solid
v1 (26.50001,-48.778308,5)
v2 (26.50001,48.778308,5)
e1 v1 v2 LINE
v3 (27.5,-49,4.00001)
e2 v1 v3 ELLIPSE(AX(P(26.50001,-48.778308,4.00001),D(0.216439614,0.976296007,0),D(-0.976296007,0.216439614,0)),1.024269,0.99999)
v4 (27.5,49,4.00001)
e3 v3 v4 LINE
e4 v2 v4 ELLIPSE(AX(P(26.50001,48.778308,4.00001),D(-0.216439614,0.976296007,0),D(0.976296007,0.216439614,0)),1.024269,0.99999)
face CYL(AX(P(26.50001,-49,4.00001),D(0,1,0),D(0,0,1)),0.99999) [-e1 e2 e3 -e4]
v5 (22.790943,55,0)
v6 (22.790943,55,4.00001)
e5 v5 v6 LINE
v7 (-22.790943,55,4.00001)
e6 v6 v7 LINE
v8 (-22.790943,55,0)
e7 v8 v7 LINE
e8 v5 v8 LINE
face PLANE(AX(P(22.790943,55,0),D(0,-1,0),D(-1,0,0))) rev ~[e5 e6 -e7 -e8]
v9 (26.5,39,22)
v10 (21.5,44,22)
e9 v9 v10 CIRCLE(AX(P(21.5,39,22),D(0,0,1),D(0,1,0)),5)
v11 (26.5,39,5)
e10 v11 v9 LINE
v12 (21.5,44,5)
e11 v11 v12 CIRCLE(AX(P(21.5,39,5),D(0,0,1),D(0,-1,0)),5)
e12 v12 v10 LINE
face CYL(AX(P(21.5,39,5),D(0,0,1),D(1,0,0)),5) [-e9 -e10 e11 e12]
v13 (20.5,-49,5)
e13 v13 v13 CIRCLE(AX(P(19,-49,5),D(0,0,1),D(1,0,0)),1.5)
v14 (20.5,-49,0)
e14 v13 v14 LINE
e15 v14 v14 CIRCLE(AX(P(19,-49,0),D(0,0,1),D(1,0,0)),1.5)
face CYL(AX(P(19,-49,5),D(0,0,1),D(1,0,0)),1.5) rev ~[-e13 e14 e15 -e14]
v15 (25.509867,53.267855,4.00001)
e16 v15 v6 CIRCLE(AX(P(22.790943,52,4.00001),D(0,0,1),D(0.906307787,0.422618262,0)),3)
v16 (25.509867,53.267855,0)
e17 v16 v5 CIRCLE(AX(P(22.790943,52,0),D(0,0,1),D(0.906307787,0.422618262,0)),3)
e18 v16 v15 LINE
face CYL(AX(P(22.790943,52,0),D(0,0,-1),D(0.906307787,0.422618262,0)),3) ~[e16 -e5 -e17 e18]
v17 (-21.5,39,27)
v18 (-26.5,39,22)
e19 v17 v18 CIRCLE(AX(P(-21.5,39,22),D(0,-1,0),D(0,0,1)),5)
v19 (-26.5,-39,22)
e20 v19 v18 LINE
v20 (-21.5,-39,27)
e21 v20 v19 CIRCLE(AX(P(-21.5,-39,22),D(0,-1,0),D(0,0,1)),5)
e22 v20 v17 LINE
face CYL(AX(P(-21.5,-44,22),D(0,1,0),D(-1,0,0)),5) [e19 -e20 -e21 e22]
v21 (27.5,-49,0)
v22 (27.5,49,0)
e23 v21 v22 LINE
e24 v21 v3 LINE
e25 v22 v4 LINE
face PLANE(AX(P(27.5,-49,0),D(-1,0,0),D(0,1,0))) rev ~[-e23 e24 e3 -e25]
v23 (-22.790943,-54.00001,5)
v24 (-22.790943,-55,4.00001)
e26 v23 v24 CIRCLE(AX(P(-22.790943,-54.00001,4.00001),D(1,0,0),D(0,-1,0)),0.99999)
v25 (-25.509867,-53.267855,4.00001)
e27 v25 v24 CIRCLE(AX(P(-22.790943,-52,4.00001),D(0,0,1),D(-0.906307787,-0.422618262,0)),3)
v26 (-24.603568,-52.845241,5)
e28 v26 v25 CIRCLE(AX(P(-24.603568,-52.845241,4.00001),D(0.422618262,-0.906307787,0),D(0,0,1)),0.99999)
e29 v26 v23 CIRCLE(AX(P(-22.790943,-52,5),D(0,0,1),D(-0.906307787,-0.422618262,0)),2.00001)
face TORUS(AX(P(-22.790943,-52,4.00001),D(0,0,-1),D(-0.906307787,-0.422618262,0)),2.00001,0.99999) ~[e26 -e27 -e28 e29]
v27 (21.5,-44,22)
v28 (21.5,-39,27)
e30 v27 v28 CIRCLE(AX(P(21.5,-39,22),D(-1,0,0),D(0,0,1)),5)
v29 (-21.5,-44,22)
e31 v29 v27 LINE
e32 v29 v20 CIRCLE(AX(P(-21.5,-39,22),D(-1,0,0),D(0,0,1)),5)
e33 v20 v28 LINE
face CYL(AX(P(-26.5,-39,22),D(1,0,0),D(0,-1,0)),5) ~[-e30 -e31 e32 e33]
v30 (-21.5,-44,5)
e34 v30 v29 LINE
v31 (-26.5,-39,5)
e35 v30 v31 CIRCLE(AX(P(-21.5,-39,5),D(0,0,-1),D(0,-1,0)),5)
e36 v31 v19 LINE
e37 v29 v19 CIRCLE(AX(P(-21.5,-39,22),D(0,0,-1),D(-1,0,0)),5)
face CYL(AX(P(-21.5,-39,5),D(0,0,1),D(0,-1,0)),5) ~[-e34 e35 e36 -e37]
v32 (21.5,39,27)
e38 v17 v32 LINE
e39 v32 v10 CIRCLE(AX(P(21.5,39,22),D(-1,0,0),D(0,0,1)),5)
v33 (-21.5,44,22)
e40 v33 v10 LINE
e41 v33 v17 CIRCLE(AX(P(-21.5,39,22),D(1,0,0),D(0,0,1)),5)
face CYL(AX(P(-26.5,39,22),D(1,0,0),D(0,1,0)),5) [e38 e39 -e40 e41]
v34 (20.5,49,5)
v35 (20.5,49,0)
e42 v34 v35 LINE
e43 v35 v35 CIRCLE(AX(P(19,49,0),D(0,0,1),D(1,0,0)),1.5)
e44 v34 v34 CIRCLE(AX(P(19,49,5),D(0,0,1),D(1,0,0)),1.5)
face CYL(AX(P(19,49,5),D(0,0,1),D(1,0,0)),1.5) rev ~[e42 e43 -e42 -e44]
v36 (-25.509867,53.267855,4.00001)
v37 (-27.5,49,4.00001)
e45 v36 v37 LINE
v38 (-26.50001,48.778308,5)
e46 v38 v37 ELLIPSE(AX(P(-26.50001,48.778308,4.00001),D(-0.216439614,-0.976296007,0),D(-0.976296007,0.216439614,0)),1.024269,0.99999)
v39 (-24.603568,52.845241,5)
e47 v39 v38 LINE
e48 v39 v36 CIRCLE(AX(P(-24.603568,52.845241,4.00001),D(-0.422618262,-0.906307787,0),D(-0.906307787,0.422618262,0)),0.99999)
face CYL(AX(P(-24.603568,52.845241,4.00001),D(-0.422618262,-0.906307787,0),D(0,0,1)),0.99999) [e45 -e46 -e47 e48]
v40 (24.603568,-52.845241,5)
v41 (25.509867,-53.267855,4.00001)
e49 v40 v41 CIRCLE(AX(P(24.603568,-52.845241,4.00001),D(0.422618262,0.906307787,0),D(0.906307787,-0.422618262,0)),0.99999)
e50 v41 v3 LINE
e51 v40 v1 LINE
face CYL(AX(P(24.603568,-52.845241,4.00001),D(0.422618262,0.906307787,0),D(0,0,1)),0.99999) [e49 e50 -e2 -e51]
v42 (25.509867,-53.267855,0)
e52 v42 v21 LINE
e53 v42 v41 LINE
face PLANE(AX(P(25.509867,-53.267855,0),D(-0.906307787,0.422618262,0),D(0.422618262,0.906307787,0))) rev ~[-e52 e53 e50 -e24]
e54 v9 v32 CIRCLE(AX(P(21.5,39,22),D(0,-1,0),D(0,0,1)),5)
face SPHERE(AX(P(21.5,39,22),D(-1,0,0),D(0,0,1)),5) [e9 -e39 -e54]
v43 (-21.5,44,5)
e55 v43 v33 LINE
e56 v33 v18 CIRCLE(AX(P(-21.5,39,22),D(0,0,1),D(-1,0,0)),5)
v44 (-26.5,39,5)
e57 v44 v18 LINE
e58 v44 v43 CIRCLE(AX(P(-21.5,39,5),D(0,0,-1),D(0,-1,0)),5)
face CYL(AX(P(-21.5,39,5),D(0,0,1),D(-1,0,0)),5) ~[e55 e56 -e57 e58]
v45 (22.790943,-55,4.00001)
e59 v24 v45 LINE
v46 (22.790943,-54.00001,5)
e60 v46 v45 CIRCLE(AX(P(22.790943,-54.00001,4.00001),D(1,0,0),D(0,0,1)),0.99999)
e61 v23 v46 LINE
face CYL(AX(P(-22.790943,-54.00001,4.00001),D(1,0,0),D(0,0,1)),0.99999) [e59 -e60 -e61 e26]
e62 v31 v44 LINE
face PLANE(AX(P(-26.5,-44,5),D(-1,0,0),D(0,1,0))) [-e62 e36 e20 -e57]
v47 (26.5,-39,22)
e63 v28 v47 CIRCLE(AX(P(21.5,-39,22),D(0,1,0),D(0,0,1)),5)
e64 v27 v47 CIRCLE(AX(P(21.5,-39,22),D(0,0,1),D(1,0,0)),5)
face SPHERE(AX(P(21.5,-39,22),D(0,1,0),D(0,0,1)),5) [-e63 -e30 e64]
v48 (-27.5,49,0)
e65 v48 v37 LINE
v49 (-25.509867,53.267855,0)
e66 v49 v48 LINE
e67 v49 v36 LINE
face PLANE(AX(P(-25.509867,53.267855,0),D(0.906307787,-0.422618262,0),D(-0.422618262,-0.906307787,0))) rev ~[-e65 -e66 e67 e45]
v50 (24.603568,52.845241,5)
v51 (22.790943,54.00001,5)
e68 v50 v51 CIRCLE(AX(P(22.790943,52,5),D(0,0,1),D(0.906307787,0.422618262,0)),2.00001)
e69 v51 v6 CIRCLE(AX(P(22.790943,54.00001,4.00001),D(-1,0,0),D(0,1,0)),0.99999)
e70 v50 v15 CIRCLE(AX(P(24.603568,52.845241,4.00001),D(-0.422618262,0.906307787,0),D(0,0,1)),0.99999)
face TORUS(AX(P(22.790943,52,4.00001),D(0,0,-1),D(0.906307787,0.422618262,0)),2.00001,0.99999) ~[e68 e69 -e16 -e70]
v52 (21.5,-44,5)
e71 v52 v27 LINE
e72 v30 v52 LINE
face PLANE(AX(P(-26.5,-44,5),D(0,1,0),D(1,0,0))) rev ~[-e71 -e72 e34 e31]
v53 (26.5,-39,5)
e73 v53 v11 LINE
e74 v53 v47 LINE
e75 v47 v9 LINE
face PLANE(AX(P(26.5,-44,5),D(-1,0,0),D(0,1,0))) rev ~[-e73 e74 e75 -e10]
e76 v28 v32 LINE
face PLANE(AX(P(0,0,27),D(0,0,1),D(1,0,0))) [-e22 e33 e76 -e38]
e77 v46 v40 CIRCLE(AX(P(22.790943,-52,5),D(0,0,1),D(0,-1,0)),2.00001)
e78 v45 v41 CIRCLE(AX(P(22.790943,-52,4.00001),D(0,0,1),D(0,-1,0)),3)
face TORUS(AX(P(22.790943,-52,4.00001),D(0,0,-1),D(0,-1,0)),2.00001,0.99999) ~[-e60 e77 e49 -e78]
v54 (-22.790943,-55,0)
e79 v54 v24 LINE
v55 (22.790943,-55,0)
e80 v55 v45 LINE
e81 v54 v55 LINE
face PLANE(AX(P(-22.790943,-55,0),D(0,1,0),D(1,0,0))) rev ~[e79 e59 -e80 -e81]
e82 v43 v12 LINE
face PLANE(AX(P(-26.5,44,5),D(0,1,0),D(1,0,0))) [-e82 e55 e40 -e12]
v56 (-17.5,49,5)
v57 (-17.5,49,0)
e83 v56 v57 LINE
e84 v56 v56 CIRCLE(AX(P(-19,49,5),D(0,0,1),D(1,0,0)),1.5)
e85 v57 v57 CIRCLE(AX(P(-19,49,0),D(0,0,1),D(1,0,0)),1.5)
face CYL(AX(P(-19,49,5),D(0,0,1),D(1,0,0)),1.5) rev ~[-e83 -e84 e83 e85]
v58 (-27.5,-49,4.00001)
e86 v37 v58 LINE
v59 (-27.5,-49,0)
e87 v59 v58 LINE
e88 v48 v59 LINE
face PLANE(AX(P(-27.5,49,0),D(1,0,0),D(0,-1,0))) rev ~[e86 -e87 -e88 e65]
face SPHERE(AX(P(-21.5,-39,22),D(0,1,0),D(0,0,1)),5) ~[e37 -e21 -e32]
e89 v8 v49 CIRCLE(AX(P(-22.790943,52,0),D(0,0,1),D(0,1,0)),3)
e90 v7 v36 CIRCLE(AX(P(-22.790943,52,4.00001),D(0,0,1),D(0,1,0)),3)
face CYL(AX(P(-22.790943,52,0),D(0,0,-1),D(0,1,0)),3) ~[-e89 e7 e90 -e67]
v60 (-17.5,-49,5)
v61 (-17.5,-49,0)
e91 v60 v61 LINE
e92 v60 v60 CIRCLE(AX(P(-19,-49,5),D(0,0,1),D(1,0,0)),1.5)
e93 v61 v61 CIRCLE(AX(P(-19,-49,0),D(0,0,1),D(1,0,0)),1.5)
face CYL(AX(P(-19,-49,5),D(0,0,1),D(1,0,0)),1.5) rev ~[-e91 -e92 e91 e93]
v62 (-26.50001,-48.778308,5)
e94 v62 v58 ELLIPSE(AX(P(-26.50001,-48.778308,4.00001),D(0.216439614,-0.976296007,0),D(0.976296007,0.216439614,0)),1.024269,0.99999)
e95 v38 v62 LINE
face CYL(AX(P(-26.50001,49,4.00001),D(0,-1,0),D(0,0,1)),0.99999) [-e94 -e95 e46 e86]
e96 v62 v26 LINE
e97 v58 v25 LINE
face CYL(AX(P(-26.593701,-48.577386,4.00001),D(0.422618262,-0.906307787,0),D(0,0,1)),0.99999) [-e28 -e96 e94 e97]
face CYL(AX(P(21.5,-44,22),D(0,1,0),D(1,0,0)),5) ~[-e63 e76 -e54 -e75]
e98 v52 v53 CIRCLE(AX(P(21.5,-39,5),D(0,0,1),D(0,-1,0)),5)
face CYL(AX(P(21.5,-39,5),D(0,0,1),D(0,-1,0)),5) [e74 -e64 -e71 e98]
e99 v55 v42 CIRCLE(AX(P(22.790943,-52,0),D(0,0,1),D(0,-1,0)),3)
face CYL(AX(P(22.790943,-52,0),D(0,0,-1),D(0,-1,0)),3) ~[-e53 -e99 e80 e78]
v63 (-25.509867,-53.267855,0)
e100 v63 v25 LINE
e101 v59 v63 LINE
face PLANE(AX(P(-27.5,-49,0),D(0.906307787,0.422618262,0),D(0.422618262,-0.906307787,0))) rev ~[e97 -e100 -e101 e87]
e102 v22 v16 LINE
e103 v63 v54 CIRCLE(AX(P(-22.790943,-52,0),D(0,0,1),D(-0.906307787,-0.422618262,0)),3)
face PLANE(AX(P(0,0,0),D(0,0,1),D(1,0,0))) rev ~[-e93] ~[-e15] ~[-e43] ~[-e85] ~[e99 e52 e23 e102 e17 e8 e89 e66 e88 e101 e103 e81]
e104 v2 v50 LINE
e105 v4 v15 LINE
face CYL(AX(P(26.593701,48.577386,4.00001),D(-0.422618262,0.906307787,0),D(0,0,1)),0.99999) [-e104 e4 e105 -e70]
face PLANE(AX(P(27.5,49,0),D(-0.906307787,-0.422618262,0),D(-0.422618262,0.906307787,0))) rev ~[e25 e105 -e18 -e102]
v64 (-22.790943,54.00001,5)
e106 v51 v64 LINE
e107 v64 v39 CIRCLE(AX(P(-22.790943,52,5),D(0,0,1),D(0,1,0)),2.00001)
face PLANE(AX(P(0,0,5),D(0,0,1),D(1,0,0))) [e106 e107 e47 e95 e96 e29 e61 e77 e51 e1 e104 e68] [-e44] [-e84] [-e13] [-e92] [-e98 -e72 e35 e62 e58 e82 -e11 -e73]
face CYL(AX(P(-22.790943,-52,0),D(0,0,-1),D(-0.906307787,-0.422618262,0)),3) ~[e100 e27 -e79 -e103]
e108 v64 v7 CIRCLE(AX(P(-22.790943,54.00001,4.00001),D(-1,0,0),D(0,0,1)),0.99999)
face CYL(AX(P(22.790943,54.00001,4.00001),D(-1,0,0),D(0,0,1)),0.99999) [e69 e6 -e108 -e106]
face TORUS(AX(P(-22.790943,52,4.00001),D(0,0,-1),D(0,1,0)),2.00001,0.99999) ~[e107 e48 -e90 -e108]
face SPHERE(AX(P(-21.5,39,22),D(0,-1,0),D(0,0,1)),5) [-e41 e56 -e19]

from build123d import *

# Parameters (mm, degrees)
F1_DEPTH = 5
F2_W     = 53
F2_H     = 88
F3_DEPTH = 22
F4_R     = 1.5
F5_DEPTH = 25
F6_R     = 5
F7_R     = 0.99999


# Not quite as in the source:
# - a fillet or chamfer is up to 0.001 mm smaller than in the source, because OpenCascade refuses the exact size


with BuildPart() as f1:
    # F0 (on Top) → F1 (new body)
    with BuildSketch(Plane.XY):
        with BuildLine():
            Line((22.7909432686, 55), (-22.7909432686, 55))
            ThreePointArc((-22.7909432686, 55), (-24.4028420937, 54.5301743374), (-25.5098666298, 53.2678547852))
            Line((-25.5098666298, 53.2678547852), (-27.5, 49))
            Line((-27.5, 49), (-27.5, -49))
            Line((-27.5, -49), (-25.5098666298, -53.2678547852))
            ThreePointArc((-25.5098666298, -53.2678547852), (-24.4028420937, -54.5301743374), (-22.7909432686, -55))
            Line((-22.7909432686, -55), (22.7909432686, -55))
            ThreePointArc((22.7909432686, -55), (24.4028420937, -54.5301743374), (25.5098666298, -53.2678547852))
            Line((25.5098666298, -53.2678547852), (27.5, -49))
            Line((27.5, -49), (27.5, 49))
            Line((27.5, 49), (25.5098666298, 53.2678547852))
            ThreePointArc((25.5098666298, 53.2678547852), (24.4028420937, 54.5301743374), (22.7909432686, 55))
        make_face()
    extrude(amount=F1_DEPTH)

    # F2 (on face) → F3 (join)
    with BuildSketch(Plane.XY.offset(5)):
        Rectangle(F2_W, F2_H)
    extrude(amount=F3_DEPTH)

    # F4 (on face) → F5 (cut)
    with BuildSketch(Plane.XY.offset(5)):
        with Locations((-19, 49)):
            Circle(F4_R)
        with Locations((19, 49)):
            Circle(F4_R)
        with Locations((-19, -49)):
            Circle(F4_R)
        with Locations((19, -49)):
            Circle(F4_R)
    extrude(amount=-F5_DEPTH, mode=Mode.SUBTRACT)

    # F6
    f6_edges = [f1.edges().sort_by_distance(p)[0] for p in [
        (-26.5, 0, 27),
        (0, 44, 27),
        (26.5, 0, 27),
        (0, -44, 27),
        (26.5, -44, 16),
        (26.5, 44, 16),
        (-26.5, 44, 16),
        (-26.5, -44, 16),
    ]]
    fillet(f6_edges, radius=F6_R)

    # F7 (radius 1 in the source; OpenCascade refuses exactly that, so slightly less here)
    f7_edges = [f1.edges().sort_by_distance(p)[0] for p in [
        (27.5, 0, 5),
        (26.504933, -51.133927, 5),
        (26.504933, 51.133927, 5),
        (-27.5, 0, 5),
    ]]
    fillet(f7_edges, radius=F7_R)


solid = f1.part
